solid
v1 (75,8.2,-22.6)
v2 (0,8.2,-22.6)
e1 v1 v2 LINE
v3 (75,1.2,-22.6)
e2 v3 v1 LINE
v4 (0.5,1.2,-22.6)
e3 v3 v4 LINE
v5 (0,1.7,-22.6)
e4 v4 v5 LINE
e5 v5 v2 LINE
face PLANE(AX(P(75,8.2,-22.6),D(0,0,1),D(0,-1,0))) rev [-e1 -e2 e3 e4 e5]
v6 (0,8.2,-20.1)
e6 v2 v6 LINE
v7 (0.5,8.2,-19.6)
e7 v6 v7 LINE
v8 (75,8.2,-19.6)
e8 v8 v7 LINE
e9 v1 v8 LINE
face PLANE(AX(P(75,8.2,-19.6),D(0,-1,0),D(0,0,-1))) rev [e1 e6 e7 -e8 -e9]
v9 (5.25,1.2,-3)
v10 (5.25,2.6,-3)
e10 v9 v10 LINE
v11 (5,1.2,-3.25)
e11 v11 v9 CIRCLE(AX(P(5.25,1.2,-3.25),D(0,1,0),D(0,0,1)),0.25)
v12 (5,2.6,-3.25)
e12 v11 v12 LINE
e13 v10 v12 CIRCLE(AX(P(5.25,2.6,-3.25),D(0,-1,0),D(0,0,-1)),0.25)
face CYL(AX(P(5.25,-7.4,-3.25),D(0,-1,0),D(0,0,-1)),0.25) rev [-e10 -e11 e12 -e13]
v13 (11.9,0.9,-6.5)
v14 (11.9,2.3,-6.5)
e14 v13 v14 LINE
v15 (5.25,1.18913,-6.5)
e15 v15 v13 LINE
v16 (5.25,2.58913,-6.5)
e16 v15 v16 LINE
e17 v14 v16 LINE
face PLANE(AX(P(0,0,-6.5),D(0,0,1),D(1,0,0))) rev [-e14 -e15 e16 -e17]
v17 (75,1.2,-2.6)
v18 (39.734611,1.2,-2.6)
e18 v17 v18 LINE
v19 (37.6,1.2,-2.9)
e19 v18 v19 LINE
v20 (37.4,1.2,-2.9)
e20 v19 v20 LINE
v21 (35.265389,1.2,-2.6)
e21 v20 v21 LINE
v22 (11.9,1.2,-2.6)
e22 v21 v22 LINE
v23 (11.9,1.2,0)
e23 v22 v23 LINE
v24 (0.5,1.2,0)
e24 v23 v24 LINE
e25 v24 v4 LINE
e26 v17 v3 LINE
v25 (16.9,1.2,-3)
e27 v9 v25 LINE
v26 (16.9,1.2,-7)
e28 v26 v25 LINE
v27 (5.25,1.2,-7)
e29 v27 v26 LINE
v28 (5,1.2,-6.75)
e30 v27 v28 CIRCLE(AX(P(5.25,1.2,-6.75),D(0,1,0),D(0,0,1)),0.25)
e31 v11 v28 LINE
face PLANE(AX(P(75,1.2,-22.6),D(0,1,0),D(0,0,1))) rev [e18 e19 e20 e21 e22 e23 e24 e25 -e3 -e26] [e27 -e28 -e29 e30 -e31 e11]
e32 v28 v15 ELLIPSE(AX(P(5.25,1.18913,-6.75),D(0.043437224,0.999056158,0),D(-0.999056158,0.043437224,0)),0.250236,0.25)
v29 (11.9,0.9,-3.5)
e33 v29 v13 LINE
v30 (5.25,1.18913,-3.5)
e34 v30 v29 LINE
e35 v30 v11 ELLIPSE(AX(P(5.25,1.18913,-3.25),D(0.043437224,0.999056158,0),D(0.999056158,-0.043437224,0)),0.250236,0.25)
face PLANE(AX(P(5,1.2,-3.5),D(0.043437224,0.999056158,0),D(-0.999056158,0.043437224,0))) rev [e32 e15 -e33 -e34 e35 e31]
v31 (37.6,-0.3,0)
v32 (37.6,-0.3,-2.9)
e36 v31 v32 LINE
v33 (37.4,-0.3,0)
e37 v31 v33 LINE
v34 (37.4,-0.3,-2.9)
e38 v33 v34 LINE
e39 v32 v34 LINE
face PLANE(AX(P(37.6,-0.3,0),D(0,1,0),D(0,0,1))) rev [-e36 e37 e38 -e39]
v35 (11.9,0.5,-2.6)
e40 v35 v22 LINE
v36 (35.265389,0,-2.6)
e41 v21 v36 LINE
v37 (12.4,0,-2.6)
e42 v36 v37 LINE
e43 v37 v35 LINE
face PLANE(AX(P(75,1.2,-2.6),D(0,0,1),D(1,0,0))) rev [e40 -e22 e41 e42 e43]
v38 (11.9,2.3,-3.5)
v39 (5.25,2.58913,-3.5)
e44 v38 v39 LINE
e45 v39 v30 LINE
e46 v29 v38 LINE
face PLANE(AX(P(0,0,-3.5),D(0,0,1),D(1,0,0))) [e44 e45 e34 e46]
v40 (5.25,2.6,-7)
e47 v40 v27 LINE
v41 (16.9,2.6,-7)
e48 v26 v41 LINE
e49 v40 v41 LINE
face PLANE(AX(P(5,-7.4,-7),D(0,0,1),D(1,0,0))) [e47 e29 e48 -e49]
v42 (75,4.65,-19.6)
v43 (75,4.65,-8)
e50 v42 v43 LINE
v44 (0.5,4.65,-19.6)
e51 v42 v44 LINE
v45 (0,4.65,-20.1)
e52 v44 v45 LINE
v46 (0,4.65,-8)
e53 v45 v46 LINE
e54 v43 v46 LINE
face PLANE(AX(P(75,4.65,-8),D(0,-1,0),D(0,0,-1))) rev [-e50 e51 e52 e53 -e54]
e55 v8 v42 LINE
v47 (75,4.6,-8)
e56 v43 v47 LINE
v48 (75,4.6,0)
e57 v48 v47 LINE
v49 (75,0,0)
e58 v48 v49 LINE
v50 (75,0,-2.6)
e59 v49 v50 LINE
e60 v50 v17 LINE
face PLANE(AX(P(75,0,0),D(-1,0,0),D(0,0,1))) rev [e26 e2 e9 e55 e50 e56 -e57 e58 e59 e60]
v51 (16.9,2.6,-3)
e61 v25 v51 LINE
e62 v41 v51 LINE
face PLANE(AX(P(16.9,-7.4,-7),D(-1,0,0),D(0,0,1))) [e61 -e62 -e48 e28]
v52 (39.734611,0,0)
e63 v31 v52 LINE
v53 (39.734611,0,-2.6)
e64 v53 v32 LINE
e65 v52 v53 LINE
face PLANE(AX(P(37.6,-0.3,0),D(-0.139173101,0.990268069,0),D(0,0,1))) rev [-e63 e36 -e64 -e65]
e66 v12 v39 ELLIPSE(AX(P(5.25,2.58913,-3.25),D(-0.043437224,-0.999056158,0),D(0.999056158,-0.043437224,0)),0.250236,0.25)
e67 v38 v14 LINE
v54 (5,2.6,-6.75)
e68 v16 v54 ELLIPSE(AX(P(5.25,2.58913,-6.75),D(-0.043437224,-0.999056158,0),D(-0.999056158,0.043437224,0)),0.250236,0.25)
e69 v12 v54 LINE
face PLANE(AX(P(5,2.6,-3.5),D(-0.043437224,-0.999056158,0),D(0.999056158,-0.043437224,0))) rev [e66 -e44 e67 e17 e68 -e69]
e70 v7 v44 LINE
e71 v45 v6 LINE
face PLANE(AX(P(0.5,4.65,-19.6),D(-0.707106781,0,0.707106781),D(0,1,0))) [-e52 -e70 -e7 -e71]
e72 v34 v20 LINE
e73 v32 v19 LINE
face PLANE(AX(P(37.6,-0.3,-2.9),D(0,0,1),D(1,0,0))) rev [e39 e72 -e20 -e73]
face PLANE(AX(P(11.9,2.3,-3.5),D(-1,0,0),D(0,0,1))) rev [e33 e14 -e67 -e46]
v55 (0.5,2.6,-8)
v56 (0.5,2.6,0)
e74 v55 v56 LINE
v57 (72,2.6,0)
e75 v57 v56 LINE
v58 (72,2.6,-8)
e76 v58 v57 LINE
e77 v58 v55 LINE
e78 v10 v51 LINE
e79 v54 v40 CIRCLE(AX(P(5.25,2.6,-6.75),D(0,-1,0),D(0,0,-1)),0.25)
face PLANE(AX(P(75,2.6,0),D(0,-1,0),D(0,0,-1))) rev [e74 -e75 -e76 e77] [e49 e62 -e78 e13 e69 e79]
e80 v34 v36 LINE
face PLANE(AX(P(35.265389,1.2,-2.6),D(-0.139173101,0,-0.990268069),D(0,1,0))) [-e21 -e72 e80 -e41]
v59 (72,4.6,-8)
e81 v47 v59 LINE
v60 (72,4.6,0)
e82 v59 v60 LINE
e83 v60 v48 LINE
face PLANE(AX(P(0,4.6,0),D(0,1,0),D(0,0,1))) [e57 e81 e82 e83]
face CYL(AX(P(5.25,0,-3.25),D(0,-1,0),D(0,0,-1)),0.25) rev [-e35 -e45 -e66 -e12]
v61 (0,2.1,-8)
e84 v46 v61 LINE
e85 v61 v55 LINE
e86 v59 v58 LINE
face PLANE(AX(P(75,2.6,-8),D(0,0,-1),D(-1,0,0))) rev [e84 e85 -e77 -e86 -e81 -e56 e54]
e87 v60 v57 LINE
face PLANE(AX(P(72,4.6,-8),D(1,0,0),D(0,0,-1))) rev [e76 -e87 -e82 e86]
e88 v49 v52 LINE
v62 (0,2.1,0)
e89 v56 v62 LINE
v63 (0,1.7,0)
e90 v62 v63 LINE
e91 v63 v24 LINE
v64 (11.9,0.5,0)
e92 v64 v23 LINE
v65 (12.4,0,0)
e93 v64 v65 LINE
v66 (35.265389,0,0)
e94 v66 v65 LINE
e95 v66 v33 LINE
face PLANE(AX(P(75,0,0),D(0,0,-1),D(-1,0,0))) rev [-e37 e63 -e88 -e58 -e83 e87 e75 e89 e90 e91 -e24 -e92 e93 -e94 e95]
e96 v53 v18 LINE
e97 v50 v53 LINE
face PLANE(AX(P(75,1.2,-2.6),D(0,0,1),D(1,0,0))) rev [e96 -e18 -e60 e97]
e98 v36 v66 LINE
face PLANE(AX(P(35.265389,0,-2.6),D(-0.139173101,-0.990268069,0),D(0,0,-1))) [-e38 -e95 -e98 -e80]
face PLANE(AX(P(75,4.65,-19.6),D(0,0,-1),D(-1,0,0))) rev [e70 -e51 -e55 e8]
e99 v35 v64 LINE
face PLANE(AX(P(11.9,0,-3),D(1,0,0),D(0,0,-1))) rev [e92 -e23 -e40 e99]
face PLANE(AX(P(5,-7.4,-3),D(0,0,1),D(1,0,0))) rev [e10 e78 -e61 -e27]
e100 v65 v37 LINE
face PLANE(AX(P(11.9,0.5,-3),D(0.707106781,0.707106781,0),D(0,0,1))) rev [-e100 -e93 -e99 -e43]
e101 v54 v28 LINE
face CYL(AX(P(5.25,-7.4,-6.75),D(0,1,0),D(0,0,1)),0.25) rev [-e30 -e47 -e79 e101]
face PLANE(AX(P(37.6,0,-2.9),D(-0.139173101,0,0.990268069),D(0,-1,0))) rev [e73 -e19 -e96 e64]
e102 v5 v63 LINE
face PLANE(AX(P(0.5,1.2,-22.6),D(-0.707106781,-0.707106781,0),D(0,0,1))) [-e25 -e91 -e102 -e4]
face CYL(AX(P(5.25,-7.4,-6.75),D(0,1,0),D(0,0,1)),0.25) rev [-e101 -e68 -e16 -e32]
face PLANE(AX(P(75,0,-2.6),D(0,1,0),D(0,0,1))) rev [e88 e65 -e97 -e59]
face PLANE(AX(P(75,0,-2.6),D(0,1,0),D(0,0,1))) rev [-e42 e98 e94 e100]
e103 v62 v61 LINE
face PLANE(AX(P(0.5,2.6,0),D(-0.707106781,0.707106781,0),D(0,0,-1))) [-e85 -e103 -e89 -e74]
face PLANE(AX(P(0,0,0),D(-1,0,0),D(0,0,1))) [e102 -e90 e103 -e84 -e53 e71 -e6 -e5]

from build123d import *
from OCP.BRepFilletAPI import BRepFilletAPI_MakeChamfer

# Parameters (mm, degrees)
BOSS_EXTRU_1_DEPTH      = 75
ESQUISSE2_W             = 11.9
ESQUISSE2_H             = 4
ENL_V_MAT_EXTRU_1_DEPTH = 10
BOSS_EXTRU_2_START      = 0.5
BOSS_EXTRU_2_DEPTH      = 3
ESQUISSE4_W             = 3
ESQUISSE4_H             = 8
BOSS_EXTRU_3_DEPTH      = 2
ESQUISSE5_W             = 11.9
ESQUISSE5_H             = 1.2
ENL_V_MAT_EXTRU_2_DEPTH = 3
CHANFREIN1_SIZE         = 0.5
CONG_1_R                = 0.25
BOSS_EXTRU_4_DEPTH      = 0.1
CHANFREIN2_SIZE         = 0.3
CHANFREIN2_SIZE_2       = 2.134610917
CHANFREIN3_SIZE         = 0.3
CHANFREIN3_SIZE_2       = 2.134610917


with BuildPart() as part:
    # Esquisse1 → Boss.-Extru.1 (new body)
    with BuildSketch(Plane(origin=(0, 0, 0), x_dir=(0, 0, -1), z_dir=(1, 0, 0))):
        Polygon((0, 0), (0, 2.6), (8, 2.6), (8, 4.65), (19.6, 4.65), (19.6, 8.2), (22.6, 8.2), (22.6, 1.2), (2.6, 1.2), (2.6, 0), align=None)
    extrude(amount=BOSS_EXTRU_1_DEPTH)

    # Esquisse2 → Enlèv. mat.-Extru.1 (cut)
    with BuildSketch(Plane(origin=(0, 2.6, 0), x_dir=(1, 0, 0), z_dir=(0, 1, 0))):
        with Locations((10.95, 5)):
            Rectangle(ESQUISSE2_W, ESQUISSE2_H)
    extrude(amount=-ENL_V_MAT_EXTRU_1_DEPTH, mode=Mode.SUBTRACT)

    # Esquisse3 → Boss.-Extru.2 (add)
    with BuildSketch(Plane.XY.offset(-7).offset(BOSS_EXTRU_2_START)):
        Polygon((5, 2.6), (11.9, 2.3), (11.9, 0.9), (5, 1.2), align=None)
    extrude(amount=BOSS_EXTRU_2_DEPTH)

    # Esquisse4 → Boss.-Extru.3 (add)
    with BuildSketch(Plane(origin=(0, 2.6, 0), x_dir=(1, 0, 0), z_dir=(0, 1, 0))):
        with Locations((73.5, 4)):
            Rectangle(ESQUISSE4_W, ESQUISSE4_H)
    extrude(amount=BOSS_EXTRU_3_DEPTH)

    # Esquisse5 → Enlèv. mat.-Extru.2 (cut)
    with BuildSketch(Plane.XY):
        with Locations((5.95, 0.6)):
            Rectangle(ESQUISSE5_W, ESQUISSE5_H)
    extrude(amount=-ENL_V_MAT_EXTRU_2_DEPTH, mode=Mode.SUBTRACT)

    # Chanfrein1
    chanfrein1_edges = [part.edges().sort_by_distance(p)[0] for p in [
        (0, 2.6, -4),
        (0, 6.425, -19.6),
        (0, 1.2, -11.3),
        (11.9, 0, -1.3),
    ]]
    chamfer(chanfrein1_edges, length=CHANFREIN1_SIZE)

    # Congé1
    cong_1_edges = [part.edges().sort_by_distance(p)[0] for p in [
        (5, 1.9, -7),
        (5, 1.9, -3),
        (5, 1.9, -6.5),
        (5, 1.9, -3.5),
    ]]
    fillet(cong_1_edges, radius=CONG_1_R - 0.0001)  # a hair under: the kernel refuses the full size

    # Esquisse6 → Boss.-Extru.4 (add, symmetric)
    with BuildSketch(Plane(origin=(37.5, 0, 0), x_dir=(0, 0, -1), z_dir=(1, 0, 0))):
        Polygon((0, 0), (0, -0.3), (2.9, -0.3), (2.9, 1.2), (2.6, 1.2), (2.6, 0), align=None)
    extrude(amount=BOSS_EXTRU_4_DEPTH, both=True)

    # Chanfrein2
    chanfrein2_edges_1 = [part.edges().sort_by_distance(p)[0] for p in [
        (37.4, 0.6, -2.6),
    ]]
    chanfrein2_side_1 = [part.faces().sort_by_distance(p)[0] for p in [
        (37.4, 0.6, -2.606),
    ]]
    chanfrein2_edges_2 = [part.edges().sort_by_distance(p)[0] for p in [
        (37.4, 0, -1.3),
    ]]
    chanfrein2_side_2 = [part.faces().sort_by_distance(p)[0] for p in [
        (37.394, 0, -1.3),
    ]]
    chanfrein2 = BRepFilletAPI_MakeChamfer(part.part.solid().wrapped)
    for e in chanfrein2_edges_1:
        chanfrein2.Add(CHANFREIN2_SIZE - 0.0001, CHANFREIN2_SIZE_2 - 0.0001, e.wrapped, chanfrein2_side_1[0].wrapped)
    for e in chanfrein2_edges_2:
        chanfrein2.Add(CHANFREIN2_SIZE_2 - 0.0001, CHANFREIN2_SIZE - 0.0001, e.wrapped, chanfrein2_side_2[0].wrapped)
    add(Compound.cast(chanfrein2.Shape()), mode=Mode.REPLACE)  # a hair under: the kernel refuses the full size

    # Chanfrein3
    chanfrein3_edges_1 = [part.edges().sort_by_distance(p)[0] for p in [
        (37.6, 0.6, -2.6),
    ]]
    chanfrein3_side_1 = [part.faces().sort_by_distance(p)[0] for p in [
        (37.6, 0.6, -2.606),
    ]]
    chanfrein3_edges_2 = [part.edges().sort_by_distance(p)[0] for p in [
        (37.6, 0, -1.3),
    ]]
    chanfrein3_side_2 = [part.faces().sort_by_distance(p)[0] for p in [
        (37.6, -0.006, -1.3),
    ]]
    chanfrein3 = BRepFilletAPI_MakeChamfer(part.part.solid().wrapped)
    for e in chanfrein3_edges_1:
        chanfrein3.Add(CHANFREIN3_SIZE - 0.0001, CHANFREIN3_SIZE_2 - 0.0001, e.wrapped, chanfrein3_side_1[0].wrapped)
    for e in chanfrein3_edges_2:
        chanfrein3.Add(CHANFREIN3_SIZE - 0.0001, CHANFREIN3_SIZE_2 - 0.0001, e.wrapped, chanfrein3_side_2[0].wrapped)
    add(Compound.cast(chanfrein3.Shape()), mode=Mode.REPLACE)  # a hair under: the kernel refuses the full size


solid = part.part
